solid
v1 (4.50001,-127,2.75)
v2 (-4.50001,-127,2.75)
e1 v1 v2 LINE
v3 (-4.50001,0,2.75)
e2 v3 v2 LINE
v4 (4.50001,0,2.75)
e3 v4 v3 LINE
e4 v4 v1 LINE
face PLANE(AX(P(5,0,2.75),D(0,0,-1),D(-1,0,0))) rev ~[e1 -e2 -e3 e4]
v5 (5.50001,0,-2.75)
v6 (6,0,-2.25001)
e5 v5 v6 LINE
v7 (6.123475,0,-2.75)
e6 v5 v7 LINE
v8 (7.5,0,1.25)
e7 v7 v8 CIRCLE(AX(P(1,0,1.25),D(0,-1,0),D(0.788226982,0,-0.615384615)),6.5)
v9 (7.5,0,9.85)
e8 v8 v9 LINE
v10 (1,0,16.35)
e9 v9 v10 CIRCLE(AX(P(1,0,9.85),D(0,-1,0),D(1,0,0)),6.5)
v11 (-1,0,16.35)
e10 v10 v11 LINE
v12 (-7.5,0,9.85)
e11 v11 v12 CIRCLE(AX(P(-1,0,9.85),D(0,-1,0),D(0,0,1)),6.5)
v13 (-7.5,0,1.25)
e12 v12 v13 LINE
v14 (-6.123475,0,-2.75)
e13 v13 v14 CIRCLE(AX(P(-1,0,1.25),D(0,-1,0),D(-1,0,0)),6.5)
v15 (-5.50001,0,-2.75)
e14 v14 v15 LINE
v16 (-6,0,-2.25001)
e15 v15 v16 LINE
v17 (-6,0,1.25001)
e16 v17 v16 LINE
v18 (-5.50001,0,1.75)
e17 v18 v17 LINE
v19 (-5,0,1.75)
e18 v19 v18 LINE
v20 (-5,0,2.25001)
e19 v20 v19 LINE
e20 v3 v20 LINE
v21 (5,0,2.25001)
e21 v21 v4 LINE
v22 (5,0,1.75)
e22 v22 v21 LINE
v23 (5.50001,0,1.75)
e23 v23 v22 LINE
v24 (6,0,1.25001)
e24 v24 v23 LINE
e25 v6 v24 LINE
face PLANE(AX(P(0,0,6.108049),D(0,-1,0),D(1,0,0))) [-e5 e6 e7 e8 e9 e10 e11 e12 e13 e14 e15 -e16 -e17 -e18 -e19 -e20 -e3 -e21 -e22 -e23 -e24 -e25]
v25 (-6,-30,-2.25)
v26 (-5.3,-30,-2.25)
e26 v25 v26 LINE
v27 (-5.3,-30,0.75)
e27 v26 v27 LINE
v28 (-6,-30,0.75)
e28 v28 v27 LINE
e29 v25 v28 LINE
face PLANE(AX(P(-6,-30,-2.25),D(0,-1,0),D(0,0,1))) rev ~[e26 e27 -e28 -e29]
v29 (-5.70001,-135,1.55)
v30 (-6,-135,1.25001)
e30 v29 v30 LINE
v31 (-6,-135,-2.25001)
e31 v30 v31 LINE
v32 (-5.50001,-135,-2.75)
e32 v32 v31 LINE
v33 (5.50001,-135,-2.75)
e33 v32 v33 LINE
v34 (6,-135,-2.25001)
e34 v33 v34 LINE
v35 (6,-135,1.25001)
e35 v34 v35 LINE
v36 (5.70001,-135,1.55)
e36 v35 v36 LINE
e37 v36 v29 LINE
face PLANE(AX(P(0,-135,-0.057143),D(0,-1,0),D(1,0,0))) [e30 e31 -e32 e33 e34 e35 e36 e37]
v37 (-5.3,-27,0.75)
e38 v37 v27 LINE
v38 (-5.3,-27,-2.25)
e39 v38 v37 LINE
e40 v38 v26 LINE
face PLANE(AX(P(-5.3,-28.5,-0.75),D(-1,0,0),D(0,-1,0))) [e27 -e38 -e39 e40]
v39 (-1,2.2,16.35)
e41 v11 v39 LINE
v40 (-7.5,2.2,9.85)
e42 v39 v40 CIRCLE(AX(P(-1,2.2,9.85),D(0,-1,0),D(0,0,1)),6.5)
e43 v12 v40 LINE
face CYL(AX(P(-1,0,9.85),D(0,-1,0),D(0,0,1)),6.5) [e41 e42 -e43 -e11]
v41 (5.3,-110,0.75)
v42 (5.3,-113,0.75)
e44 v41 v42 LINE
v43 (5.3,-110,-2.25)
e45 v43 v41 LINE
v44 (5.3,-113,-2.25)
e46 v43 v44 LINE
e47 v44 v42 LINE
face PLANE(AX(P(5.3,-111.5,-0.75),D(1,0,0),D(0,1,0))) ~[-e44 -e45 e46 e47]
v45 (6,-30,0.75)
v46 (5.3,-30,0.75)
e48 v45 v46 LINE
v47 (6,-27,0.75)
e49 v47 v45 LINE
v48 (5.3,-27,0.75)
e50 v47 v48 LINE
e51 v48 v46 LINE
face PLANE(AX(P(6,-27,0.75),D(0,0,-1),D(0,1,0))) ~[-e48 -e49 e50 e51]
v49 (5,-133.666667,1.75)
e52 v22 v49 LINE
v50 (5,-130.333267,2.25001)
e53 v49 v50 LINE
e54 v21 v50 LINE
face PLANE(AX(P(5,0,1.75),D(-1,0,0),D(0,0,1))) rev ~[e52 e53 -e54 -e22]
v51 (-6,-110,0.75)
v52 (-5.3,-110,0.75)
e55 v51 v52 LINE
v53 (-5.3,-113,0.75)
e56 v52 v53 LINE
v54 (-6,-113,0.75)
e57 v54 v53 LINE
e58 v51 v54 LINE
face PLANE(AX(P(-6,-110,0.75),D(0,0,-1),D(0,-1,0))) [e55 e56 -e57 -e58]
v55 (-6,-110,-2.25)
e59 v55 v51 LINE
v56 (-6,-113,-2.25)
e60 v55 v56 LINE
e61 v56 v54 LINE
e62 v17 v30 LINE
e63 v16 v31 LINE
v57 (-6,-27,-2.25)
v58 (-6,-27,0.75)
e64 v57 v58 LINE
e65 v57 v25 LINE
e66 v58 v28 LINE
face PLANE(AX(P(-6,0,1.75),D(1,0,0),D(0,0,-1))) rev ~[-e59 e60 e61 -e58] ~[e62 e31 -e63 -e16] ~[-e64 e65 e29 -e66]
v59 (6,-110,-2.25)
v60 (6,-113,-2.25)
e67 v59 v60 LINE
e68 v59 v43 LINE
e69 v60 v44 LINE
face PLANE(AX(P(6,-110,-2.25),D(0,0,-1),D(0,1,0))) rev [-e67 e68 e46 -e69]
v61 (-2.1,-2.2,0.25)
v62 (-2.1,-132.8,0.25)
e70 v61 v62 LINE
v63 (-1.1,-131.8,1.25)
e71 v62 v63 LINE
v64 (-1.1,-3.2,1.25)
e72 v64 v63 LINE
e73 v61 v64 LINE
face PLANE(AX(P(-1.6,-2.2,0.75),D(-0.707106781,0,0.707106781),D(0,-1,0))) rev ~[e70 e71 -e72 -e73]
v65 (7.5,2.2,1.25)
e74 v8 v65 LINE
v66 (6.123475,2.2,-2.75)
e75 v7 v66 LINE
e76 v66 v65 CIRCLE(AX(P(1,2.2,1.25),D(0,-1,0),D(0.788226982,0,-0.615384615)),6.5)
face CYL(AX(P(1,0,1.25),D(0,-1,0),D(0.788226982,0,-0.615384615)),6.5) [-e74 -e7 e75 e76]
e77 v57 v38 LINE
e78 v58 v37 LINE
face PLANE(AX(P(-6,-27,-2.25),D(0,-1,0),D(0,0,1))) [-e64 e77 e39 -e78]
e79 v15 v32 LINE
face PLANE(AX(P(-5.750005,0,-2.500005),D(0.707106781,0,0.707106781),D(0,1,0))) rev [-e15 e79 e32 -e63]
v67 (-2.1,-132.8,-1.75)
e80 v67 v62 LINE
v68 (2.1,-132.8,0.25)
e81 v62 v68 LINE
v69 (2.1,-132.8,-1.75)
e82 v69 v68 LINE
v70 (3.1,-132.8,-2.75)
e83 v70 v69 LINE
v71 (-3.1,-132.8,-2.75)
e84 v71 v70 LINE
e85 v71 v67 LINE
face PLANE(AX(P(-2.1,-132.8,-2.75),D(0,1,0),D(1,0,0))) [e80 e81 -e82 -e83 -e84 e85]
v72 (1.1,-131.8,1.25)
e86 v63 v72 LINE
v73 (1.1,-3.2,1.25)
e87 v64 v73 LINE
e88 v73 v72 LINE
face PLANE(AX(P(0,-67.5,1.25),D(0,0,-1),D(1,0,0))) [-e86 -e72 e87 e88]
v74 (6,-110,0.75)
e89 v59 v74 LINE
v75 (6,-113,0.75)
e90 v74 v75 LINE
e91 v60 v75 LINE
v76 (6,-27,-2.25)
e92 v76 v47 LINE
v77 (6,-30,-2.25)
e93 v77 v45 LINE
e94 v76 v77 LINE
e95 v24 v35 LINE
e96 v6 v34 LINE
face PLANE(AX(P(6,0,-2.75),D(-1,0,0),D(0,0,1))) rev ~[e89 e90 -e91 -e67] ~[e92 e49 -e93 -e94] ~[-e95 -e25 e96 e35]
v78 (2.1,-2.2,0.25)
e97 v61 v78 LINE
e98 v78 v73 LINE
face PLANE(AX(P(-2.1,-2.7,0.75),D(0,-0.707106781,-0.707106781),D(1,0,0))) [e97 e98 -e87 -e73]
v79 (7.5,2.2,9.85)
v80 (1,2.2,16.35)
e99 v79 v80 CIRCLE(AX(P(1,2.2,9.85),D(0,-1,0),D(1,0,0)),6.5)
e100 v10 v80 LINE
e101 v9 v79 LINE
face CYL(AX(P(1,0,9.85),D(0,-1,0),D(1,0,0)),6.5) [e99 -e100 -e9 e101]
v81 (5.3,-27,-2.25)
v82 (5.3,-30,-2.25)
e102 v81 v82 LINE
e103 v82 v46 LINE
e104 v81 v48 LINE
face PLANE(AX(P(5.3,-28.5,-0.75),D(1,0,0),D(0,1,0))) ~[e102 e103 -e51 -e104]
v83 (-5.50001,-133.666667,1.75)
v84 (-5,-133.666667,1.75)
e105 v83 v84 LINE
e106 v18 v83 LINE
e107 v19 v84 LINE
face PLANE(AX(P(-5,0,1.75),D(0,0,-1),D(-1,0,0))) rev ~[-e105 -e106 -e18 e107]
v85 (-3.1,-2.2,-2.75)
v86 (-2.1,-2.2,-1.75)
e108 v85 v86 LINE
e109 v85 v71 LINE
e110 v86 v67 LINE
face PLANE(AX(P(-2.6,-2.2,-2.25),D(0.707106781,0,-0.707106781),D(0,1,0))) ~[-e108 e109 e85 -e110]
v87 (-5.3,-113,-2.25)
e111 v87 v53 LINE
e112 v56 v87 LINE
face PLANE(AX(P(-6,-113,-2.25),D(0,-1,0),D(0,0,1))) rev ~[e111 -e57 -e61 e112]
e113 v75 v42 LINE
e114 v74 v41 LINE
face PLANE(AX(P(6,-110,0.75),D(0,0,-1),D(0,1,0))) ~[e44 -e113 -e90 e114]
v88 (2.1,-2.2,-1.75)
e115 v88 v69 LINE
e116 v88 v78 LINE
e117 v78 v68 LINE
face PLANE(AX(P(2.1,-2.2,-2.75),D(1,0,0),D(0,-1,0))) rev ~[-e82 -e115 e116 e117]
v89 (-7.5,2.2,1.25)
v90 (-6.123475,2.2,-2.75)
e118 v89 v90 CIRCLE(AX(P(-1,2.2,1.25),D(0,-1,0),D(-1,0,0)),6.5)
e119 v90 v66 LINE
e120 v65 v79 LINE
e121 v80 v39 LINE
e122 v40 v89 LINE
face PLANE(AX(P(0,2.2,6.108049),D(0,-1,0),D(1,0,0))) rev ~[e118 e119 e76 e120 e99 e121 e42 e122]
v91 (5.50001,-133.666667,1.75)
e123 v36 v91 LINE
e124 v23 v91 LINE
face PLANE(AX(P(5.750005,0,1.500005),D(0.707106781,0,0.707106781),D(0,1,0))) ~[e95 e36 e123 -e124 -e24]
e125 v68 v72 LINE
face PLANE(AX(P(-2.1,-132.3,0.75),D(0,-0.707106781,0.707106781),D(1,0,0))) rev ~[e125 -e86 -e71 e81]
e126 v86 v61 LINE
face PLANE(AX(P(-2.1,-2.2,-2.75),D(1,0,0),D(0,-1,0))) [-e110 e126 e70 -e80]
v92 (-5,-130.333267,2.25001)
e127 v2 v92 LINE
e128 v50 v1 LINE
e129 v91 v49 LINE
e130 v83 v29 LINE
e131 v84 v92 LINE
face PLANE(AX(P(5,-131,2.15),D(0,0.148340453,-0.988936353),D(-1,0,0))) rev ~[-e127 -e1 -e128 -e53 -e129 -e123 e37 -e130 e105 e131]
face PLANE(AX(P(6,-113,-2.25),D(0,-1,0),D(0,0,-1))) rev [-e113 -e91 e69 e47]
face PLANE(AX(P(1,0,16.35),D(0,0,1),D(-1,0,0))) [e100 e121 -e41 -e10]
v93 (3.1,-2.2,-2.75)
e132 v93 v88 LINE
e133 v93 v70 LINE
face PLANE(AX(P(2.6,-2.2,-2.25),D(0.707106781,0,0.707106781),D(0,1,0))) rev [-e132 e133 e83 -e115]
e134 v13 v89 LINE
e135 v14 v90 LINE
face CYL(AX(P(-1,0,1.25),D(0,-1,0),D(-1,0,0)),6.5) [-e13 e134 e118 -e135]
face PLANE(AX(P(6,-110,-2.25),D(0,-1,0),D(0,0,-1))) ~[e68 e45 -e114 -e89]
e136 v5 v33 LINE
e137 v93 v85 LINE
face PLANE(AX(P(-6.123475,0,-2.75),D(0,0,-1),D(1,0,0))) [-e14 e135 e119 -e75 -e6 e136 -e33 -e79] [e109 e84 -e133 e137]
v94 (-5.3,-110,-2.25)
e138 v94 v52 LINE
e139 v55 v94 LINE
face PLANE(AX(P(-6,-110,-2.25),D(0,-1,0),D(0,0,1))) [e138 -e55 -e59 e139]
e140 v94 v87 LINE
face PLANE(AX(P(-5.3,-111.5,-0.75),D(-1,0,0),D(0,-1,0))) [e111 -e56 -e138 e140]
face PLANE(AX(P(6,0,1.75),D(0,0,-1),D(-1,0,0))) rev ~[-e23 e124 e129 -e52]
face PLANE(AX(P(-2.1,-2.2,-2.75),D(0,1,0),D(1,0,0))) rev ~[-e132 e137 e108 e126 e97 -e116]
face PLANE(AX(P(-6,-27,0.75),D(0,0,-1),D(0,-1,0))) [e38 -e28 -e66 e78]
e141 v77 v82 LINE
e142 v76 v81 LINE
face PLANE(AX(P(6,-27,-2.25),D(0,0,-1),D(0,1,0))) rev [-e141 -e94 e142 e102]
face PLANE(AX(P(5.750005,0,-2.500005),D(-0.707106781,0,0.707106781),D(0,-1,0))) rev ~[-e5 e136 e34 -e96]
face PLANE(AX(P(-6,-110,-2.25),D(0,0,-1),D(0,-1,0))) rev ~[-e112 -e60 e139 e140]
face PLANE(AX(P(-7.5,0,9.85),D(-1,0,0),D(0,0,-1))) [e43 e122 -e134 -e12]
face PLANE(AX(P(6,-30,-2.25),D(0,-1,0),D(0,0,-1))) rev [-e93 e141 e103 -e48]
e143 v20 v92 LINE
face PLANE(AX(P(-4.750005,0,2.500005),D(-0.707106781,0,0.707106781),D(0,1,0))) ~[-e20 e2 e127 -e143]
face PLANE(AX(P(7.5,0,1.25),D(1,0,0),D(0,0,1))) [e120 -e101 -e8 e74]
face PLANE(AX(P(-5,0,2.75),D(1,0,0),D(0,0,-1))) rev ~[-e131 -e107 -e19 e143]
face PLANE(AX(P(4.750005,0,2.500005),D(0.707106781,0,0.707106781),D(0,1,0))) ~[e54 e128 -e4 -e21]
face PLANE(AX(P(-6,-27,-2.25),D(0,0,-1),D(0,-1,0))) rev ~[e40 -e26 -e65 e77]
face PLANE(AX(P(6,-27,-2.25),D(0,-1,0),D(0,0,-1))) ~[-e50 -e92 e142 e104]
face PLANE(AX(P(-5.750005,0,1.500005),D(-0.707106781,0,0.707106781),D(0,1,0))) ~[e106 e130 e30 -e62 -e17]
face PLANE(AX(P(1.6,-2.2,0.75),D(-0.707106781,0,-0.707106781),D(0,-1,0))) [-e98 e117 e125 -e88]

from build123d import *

# Parameters (mm, degrees)
F1_DEPTH = 135
F2_SIZE2 = 8
F2_SIZE  = 1.2
F4_DEPTH = 2.2
F5_W     = 3
F5_H     = 3
F6_DEPTH = 0.7
F7_SIZE  = 0.49999
F8_W     = 4.2
F8_H     = 130.6
F9_DEPTH = 4
F10_SIZE = 1


# Not quite as in the source:
# - a fillet or chamfer is up to 0.001 mm smaller than in the source, because OpenCascade refuses the exact size
# - a pattern or mirror of a feature is missing from the dataset's text; its kind, count and spacing are read off the source's solid


with BuildPart() as f1:
    # F0 (on Front) → F1 (new body)
    with BuildSketch(Plane.XZ):
        Polygon((-6, -2.75), (6, -2.75), (6, 1.75), (5, 1.75), (5, 2.75), (-5, 2.75), (-5, 1.75), (-6, 1.75), align=None)
    extrude(amount=F1_DEPTH)

    # F2
    f2_edges = [f1.edges().sort_by_distance(p)[0] for p in [
        (0, -135, 2.75),
    ]]
    f2_side = f1.faces().sort_by_distance((0, -135, -0.070312))[0]
    chamfer(f2_edges, length=F2_SIZE, length2=F2_SIZE2, reference=f2_side)

    # F3 (on Front) → F4 (join)
    with BuildSketch(Plane.XZ):
        with BuildLine():
            ThreePointArc((7.5, 9.85), (5.5961940777, 14.4461940777), (1, 16.35))
            Line((1, 16.35), (-1, 16.35))
            ThreePointArc((-1, 16.35), (-5.5961940777, 14.4461940777), (-7.5, 9.85))
            Line((-7.5, 9.85), (-7.5, 1.25))
            ThreePointArc((-7.5, 1.25), (-7.1462423475, -0.8651134734), (-6.123475383, -2.75))
            Line((-6.123475383, -2.75), (6.123475383, -2.75))
            ThreePointArc((6.123475383, -2.75), (7.1462423475, -0.8651134734), (7.5, 1.25))
            Line((7.5, 1.25), (7.5, 9.85))
        make_face()
    extrude(amount=-F4_DEPTH)

    # F5 (on face) → F6 (cut)
    with BuildSketch(Plane(origin=(-6, 0, 0), x_dir=(0, -1, 0), z_dir=(-1, 0, 0))):
        with Locations((28.5, -0.75)):
            Rectangle(F5_W, F5_H)
        with Locations((111.5, -0.75)):
            Rectangle(F5_W, F5_H)
    f6 = extrude(amount=-F6_DEPTH, mode=Mode.SUBTRACT)

    # F6_copies: F6 across plane
    add(f6.mirror(Plane(origin=(0, 0, 0), x_dir=(0, 0, 1), z_dir=(1, 0, 0))), mode=Mode.SUBTRACT)

    # F7 (size 0.5 in the source; OpenCascade refuses exactly that, so slightly less here)
    f7_edges = [f1.edges().sort_by_distance(p)[0] for p in [
        (6, -67.5, -2.75),
        (-6, -67.5, -2.75),
        (6, -66.833333, 1.75),
        (5, -63.5, 2.75),
        (-5, -63.5, 2.75),
        (-6, -66.833333, 1.75),
    ]]
    chamfer(f7_edges, length=F7_SIZE)

    # F8 (on face) → F9 (cut)
    with BuildSketch(Plane(origin=(0, 0, -2.75), x_dir=(1, 0, 0), z_dir=(0, 0, -1))):
        with Locations((0, 67.5)):
            Rectangle(F8_W, F8_H)
    extrude(amount=-F9_DEPTH, mode=Mode.SUBTRACT)

    # F10
    f10_edges = [f1.edges().sort_by_distance(p)[0] for p in [
        (0, -132.8, 1.25),
        (-2.1, -67.5, 1.25),
        (2.1, -67.5, 1.25),
        (0, -2.2, 1.25),
        (2.1, -67.5, -2.75),
        (-2.1, -67.5, -2.75),
    ]]
    chamfer(f10_edges, length=F10_SIZE)


solid = f1.part
